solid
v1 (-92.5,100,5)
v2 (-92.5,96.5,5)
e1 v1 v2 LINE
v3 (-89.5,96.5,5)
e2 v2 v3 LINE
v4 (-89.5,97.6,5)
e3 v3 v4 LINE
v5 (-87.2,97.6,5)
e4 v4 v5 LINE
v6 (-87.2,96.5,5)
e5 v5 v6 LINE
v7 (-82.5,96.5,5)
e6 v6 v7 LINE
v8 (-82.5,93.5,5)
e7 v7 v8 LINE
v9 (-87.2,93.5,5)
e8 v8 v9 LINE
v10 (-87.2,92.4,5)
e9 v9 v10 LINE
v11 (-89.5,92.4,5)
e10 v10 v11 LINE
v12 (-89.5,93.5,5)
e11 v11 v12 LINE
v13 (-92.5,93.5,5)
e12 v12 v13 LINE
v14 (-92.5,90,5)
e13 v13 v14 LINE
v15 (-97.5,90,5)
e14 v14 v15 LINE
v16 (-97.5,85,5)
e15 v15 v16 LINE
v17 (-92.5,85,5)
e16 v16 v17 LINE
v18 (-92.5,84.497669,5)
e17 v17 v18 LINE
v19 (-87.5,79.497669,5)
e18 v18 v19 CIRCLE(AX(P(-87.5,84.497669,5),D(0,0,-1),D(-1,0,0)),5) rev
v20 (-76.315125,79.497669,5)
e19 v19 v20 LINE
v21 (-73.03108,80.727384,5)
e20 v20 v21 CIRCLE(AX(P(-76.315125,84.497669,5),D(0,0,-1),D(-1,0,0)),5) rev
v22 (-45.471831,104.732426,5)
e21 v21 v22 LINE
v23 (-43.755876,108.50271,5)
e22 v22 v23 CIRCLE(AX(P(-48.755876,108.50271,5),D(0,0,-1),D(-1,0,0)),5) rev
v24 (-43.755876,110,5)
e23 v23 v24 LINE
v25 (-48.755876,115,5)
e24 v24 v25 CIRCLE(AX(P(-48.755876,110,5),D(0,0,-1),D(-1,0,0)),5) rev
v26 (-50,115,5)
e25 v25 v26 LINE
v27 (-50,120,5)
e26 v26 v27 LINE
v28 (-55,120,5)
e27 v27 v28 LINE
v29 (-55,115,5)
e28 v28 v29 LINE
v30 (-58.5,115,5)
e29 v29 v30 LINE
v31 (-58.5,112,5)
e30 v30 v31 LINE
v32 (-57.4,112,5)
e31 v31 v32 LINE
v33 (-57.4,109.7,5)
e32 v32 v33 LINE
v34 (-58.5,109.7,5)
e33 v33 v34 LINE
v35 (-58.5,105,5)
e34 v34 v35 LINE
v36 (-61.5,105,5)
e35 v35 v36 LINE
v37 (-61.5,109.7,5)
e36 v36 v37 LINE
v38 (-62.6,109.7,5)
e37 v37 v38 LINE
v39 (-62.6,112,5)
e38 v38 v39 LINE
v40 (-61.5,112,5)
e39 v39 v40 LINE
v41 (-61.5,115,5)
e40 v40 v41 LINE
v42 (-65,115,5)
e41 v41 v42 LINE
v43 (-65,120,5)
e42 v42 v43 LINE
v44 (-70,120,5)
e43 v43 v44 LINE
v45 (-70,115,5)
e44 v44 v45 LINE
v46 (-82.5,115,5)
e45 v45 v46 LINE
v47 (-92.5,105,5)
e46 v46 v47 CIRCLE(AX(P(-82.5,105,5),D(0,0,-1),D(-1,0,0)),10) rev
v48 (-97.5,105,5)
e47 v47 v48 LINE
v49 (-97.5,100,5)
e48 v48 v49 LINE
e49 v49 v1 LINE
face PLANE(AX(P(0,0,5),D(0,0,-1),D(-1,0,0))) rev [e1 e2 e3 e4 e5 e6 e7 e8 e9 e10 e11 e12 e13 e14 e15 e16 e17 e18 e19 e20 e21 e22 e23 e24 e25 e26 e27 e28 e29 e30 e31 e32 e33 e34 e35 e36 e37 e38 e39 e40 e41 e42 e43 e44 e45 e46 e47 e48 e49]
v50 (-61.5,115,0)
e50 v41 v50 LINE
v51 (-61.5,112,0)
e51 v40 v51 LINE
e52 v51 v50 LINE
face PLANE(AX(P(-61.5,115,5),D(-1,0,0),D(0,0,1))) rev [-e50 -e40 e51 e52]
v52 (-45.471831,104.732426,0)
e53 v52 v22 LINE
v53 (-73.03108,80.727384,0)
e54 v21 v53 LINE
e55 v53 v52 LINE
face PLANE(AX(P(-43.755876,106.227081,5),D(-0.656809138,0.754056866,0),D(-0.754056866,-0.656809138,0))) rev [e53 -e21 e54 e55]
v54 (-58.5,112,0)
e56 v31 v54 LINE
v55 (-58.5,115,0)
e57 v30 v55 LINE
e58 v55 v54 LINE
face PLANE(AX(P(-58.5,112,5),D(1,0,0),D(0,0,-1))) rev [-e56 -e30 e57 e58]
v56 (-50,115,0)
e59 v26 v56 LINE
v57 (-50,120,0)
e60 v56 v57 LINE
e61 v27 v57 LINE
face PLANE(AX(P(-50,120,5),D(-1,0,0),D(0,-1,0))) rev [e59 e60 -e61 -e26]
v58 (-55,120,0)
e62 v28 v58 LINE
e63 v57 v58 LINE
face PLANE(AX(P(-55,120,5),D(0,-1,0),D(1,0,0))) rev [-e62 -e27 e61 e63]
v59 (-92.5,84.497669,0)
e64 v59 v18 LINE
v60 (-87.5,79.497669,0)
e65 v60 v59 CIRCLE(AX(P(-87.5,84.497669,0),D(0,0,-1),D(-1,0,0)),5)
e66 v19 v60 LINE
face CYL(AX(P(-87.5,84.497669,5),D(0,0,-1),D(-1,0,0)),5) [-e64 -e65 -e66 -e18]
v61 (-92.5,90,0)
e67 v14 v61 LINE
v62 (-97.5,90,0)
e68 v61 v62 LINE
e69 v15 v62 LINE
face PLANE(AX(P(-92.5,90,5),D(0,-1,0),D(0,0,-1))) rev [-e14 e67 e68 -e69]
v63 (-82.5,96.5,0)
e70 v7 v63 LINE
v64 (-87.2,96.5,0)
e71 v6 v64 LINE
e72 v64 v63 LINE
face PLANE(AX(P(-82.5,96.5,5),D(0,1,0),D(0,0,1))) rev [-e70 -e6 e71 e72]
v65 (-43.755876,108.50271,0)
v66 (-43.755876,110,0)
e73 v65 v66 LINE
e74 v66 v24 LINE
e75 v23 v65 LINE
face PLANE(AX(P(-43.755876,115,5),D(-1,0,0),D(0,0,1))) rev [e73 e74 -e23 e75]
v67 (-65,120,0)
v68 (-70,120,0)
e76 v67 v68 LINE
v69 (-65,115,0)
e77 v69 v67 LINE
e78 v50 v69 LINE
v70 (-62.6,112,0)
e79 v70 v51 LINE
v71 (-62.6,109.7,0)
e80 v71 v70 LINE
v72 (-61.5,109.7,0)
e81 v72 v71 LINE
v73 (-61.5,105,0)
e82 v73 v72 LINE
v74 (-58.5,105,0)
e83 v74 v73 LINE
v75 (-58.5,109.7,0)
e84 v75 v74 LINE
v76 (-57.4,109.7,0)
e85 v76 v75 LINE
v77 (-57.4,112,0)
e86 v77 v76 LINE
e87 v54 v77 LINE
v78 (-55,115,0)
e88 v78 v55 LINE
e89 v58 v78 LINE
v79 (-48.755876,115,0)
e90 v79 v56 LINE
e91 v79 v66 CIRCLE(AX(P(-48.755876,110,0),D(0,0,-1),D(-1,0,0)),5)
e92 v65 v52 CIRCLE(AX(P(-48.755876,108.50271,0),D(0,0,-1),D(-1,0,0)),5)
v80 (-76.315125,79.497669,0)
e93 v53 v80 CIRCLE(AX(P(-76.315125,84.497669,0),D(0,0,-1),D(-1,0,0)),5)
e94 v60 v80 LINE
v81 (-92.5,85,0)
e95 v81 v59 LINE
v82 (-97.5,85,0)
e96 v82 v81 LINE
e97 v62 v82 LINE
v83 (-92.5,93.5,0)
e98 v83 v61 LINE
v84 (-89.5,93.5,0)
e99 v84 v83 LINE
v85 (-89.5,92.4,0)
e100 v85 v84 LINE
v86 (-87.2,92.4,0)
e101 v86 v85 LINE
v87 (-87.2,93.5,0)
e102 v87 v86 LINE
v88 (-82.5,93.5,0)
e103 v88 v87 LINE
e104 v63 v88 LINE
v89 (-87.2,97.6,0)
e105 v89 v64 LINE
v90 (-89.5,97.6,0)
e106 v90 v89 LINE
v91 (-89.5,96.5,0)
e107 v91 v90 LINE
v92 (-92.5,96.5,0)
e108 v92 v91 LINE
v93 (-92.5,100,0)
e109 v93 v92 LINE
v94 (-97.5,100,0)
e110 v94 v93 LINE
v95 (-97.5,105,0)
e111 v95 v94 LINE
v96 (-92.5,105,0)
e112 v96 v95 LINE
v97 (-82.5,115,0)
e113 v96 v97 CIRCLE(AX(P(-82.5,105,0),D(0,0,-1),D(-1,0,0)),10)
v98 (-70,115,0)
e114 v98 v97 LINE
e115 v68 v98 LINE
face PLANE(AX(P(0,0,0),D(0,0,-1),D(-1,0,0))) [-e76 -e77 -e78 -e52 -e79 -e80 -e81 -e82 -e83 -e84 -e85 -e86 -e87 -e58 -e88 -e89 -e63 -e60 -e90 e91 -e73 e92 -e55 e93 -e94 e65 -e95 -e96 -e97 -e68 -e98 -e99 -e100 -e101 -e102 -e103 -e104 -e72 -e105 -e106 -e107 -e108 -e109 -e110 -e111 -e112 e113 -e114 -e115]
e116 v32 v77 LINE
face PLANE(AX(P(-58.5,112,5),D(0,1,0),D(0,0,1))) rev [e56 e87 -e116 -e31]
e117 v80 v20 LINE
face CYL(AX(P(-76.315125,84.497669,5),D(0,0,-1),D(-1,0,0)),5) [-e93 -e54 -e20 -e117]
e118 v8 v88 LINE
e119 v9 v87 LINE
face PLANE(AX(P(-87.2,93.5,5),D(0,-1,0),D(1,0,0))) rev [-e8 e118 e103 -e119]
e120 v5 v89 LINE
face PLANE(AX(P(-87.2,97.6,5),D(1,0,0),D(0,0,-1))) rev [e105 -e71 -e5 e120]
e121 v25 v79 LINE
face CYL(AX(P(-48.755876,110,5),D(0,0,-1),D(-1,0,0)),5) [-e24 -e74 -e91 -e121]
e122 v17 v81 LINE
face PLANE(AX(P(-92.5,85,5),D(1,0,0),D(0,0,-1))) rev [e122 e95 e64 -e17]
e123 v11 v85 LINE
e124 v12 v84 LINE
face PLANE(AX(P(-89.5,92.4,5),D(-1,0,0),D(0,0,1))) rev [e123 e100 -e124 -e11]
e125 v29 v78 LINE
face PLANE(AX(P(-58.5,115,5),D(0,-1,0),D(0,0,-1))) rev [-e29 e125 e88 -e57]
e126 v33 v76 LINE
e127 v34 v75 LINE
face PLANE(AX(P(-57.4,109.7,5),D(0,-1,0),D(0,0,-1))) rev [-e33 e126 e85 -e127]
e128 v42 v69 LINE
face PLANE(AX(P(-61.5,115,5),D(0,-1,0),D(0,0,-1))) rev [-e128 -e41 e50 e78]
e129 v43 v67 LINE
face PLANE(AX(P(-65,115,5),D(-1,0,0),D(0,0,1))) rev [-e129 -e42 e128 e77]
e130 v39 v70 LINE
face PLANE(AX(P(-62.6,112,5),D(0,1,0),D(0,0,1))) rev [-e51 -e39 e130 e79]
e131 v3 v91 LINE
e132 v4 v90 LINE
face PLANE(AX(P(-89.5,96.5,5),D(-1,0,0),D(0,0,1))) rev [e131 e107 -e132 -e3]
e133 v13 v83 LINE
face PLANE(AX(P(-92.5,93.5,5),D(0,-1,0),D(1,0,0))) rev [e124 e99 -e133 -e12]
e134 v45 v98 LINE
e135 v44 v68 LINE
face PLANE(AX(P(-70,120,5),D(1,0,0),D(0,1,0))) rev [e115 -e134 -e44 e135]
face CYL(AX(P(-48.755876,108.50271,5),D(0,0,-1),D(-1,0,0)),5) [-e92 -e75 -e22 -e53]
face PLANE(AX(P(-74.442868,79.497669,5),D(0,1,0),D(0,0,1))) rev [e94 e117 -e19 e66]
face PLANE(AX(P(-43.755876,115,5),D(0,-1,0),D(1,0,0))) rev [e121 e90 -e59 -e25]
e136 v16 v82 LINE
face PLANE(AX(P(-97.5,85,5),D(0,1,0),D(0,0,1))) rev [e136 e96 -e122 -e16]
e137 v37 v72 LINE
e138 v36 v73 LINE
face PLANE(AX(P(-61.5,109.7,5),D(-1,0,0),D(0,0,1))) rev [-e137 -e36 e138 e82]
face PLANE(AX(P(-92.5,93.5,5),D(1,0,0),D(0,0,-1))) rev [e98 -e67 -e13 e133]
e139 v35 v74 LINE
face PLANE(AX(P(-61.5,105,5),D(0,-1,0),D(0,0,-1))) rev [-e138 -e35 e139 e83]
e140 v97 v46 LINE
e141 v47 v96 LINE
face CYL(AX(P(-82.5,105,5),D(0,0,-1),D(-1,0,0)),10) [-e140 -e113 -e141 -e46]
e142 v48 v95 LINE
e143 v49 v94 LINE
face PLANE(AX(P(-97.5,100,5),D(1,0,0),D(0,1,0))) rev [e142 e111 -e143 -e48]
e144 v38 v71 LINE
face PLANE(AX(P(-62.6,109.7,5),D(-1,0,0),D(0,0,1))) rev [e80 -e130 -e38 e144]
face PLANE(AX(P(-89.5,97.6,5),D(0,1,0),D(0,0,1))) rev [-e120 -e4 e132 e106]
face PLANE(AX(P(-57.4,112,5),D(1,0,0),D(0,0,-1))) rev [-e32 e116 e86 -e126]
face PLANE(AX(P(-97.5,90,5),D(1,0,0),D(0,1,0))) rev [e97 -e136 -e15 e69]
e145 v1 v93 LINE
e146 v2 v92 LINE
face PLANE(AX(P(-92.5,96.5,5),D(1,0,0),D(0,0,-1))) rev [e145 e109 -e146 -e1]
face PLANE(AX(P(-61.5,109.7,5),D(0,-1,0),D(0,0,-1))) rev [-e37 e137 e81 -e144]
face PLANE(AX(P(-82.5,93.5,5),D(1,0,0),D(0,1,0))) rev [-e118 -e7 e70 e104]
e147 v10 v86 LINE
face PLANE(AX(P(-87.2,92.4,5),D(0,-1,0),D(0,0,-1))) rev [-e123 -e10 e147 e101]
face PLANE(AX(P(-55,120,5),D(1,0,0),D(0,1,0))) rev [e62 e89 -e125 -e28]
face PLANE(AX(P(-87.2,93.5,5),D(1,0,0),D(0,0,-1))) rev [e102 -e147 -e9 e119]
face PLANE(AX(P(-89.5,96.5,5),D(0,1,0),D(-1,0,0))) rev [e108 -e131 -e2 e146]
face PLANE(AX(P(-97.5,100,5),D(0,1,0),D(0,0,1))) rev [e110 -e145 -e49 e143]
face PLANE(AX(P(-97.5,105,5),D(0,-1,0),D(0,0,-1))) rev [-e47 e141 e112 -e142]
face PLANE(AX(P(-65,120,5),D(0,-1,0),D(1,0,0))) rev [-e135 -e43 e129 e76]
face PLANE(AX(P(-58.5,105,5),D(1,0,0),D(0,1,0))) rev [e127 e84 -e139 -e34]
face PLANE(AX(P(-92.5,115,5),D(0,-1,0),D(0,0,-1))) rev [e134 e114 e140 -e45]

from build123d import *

# Parameters (mm, degrees)
BOSS_EXTRUDE1_DEPTH = 5
FILLET1_R           = 10
FILLET2_R           = 5


with BuildPart() as part:
    # Sketch1 → Boss-Extrude1 (new body)
    with BuildSketch(Plane.XY):
        Polygon((-92.5, 96.5), (-92.5, 100), (-97.5, 100), (-97.5, 105), (-92.5, 105), (-92.5, 115), (-70, 115), (-70, 120), (-65, 120), (-65, 115), (-61.5, 115), (-61.5, 112), (-62.6, 112), (-62.6, 109.7), (-61.5, 109.7), (-61.5, 105), (-58.5, 105), (-58.5, 109.7), (-57.4, 109.7), (-57.4, 112), (-58.5, 112), (-58.5, 115), (-55, 115), (-55, 120), (-50, 120), (-50, 115), (-43.75587644, 115), (-43.75587644, 106.227080611), (-74.442868217, 79.497668649), (-92.5, 79.497668649), (-92.5, 85), (-97.5, 85), (-97.5, 90), (-92.5, 90), (-92.5, 93.5), (-89.5, 93.5), (-89.5, 92.4), (-87.2, 92.4), (-87.2, 93.5), (-82.5, 93.5), (-82.5, 96.5), (-87.2, 96.5), (-87.2, 97.6), (-89.5, 97.6), (-89.5, 96.5), align=None)
    extrude(amount=BOSS_EXTRUDE1_DEPTH)

    # Fillet1
    fillet1_edges = [part.edges().sort_by_distance(p)[0] for p in [
        (-92.5, 115, 2.5),
    ]]
    fillet(fillet1_edges, radius=FILLET1_R - 0.0001)  # a hair under: the kernel refuses the full size

    # Fillet2
    fillet2_edges = [part.edges().sort_by_distance(p)[0] for p in [
        (-43.75587644, 115, 2.5),
        (-43.75587644, 106.227080611, 2.5),
        (-74.442868217, 79.497668649, 2.5),
        (-92.5, 79.497668649, 2.5),
    ]]
    fillet(fillet2_edges, radius=FILLET2_R)


solid = part.part
